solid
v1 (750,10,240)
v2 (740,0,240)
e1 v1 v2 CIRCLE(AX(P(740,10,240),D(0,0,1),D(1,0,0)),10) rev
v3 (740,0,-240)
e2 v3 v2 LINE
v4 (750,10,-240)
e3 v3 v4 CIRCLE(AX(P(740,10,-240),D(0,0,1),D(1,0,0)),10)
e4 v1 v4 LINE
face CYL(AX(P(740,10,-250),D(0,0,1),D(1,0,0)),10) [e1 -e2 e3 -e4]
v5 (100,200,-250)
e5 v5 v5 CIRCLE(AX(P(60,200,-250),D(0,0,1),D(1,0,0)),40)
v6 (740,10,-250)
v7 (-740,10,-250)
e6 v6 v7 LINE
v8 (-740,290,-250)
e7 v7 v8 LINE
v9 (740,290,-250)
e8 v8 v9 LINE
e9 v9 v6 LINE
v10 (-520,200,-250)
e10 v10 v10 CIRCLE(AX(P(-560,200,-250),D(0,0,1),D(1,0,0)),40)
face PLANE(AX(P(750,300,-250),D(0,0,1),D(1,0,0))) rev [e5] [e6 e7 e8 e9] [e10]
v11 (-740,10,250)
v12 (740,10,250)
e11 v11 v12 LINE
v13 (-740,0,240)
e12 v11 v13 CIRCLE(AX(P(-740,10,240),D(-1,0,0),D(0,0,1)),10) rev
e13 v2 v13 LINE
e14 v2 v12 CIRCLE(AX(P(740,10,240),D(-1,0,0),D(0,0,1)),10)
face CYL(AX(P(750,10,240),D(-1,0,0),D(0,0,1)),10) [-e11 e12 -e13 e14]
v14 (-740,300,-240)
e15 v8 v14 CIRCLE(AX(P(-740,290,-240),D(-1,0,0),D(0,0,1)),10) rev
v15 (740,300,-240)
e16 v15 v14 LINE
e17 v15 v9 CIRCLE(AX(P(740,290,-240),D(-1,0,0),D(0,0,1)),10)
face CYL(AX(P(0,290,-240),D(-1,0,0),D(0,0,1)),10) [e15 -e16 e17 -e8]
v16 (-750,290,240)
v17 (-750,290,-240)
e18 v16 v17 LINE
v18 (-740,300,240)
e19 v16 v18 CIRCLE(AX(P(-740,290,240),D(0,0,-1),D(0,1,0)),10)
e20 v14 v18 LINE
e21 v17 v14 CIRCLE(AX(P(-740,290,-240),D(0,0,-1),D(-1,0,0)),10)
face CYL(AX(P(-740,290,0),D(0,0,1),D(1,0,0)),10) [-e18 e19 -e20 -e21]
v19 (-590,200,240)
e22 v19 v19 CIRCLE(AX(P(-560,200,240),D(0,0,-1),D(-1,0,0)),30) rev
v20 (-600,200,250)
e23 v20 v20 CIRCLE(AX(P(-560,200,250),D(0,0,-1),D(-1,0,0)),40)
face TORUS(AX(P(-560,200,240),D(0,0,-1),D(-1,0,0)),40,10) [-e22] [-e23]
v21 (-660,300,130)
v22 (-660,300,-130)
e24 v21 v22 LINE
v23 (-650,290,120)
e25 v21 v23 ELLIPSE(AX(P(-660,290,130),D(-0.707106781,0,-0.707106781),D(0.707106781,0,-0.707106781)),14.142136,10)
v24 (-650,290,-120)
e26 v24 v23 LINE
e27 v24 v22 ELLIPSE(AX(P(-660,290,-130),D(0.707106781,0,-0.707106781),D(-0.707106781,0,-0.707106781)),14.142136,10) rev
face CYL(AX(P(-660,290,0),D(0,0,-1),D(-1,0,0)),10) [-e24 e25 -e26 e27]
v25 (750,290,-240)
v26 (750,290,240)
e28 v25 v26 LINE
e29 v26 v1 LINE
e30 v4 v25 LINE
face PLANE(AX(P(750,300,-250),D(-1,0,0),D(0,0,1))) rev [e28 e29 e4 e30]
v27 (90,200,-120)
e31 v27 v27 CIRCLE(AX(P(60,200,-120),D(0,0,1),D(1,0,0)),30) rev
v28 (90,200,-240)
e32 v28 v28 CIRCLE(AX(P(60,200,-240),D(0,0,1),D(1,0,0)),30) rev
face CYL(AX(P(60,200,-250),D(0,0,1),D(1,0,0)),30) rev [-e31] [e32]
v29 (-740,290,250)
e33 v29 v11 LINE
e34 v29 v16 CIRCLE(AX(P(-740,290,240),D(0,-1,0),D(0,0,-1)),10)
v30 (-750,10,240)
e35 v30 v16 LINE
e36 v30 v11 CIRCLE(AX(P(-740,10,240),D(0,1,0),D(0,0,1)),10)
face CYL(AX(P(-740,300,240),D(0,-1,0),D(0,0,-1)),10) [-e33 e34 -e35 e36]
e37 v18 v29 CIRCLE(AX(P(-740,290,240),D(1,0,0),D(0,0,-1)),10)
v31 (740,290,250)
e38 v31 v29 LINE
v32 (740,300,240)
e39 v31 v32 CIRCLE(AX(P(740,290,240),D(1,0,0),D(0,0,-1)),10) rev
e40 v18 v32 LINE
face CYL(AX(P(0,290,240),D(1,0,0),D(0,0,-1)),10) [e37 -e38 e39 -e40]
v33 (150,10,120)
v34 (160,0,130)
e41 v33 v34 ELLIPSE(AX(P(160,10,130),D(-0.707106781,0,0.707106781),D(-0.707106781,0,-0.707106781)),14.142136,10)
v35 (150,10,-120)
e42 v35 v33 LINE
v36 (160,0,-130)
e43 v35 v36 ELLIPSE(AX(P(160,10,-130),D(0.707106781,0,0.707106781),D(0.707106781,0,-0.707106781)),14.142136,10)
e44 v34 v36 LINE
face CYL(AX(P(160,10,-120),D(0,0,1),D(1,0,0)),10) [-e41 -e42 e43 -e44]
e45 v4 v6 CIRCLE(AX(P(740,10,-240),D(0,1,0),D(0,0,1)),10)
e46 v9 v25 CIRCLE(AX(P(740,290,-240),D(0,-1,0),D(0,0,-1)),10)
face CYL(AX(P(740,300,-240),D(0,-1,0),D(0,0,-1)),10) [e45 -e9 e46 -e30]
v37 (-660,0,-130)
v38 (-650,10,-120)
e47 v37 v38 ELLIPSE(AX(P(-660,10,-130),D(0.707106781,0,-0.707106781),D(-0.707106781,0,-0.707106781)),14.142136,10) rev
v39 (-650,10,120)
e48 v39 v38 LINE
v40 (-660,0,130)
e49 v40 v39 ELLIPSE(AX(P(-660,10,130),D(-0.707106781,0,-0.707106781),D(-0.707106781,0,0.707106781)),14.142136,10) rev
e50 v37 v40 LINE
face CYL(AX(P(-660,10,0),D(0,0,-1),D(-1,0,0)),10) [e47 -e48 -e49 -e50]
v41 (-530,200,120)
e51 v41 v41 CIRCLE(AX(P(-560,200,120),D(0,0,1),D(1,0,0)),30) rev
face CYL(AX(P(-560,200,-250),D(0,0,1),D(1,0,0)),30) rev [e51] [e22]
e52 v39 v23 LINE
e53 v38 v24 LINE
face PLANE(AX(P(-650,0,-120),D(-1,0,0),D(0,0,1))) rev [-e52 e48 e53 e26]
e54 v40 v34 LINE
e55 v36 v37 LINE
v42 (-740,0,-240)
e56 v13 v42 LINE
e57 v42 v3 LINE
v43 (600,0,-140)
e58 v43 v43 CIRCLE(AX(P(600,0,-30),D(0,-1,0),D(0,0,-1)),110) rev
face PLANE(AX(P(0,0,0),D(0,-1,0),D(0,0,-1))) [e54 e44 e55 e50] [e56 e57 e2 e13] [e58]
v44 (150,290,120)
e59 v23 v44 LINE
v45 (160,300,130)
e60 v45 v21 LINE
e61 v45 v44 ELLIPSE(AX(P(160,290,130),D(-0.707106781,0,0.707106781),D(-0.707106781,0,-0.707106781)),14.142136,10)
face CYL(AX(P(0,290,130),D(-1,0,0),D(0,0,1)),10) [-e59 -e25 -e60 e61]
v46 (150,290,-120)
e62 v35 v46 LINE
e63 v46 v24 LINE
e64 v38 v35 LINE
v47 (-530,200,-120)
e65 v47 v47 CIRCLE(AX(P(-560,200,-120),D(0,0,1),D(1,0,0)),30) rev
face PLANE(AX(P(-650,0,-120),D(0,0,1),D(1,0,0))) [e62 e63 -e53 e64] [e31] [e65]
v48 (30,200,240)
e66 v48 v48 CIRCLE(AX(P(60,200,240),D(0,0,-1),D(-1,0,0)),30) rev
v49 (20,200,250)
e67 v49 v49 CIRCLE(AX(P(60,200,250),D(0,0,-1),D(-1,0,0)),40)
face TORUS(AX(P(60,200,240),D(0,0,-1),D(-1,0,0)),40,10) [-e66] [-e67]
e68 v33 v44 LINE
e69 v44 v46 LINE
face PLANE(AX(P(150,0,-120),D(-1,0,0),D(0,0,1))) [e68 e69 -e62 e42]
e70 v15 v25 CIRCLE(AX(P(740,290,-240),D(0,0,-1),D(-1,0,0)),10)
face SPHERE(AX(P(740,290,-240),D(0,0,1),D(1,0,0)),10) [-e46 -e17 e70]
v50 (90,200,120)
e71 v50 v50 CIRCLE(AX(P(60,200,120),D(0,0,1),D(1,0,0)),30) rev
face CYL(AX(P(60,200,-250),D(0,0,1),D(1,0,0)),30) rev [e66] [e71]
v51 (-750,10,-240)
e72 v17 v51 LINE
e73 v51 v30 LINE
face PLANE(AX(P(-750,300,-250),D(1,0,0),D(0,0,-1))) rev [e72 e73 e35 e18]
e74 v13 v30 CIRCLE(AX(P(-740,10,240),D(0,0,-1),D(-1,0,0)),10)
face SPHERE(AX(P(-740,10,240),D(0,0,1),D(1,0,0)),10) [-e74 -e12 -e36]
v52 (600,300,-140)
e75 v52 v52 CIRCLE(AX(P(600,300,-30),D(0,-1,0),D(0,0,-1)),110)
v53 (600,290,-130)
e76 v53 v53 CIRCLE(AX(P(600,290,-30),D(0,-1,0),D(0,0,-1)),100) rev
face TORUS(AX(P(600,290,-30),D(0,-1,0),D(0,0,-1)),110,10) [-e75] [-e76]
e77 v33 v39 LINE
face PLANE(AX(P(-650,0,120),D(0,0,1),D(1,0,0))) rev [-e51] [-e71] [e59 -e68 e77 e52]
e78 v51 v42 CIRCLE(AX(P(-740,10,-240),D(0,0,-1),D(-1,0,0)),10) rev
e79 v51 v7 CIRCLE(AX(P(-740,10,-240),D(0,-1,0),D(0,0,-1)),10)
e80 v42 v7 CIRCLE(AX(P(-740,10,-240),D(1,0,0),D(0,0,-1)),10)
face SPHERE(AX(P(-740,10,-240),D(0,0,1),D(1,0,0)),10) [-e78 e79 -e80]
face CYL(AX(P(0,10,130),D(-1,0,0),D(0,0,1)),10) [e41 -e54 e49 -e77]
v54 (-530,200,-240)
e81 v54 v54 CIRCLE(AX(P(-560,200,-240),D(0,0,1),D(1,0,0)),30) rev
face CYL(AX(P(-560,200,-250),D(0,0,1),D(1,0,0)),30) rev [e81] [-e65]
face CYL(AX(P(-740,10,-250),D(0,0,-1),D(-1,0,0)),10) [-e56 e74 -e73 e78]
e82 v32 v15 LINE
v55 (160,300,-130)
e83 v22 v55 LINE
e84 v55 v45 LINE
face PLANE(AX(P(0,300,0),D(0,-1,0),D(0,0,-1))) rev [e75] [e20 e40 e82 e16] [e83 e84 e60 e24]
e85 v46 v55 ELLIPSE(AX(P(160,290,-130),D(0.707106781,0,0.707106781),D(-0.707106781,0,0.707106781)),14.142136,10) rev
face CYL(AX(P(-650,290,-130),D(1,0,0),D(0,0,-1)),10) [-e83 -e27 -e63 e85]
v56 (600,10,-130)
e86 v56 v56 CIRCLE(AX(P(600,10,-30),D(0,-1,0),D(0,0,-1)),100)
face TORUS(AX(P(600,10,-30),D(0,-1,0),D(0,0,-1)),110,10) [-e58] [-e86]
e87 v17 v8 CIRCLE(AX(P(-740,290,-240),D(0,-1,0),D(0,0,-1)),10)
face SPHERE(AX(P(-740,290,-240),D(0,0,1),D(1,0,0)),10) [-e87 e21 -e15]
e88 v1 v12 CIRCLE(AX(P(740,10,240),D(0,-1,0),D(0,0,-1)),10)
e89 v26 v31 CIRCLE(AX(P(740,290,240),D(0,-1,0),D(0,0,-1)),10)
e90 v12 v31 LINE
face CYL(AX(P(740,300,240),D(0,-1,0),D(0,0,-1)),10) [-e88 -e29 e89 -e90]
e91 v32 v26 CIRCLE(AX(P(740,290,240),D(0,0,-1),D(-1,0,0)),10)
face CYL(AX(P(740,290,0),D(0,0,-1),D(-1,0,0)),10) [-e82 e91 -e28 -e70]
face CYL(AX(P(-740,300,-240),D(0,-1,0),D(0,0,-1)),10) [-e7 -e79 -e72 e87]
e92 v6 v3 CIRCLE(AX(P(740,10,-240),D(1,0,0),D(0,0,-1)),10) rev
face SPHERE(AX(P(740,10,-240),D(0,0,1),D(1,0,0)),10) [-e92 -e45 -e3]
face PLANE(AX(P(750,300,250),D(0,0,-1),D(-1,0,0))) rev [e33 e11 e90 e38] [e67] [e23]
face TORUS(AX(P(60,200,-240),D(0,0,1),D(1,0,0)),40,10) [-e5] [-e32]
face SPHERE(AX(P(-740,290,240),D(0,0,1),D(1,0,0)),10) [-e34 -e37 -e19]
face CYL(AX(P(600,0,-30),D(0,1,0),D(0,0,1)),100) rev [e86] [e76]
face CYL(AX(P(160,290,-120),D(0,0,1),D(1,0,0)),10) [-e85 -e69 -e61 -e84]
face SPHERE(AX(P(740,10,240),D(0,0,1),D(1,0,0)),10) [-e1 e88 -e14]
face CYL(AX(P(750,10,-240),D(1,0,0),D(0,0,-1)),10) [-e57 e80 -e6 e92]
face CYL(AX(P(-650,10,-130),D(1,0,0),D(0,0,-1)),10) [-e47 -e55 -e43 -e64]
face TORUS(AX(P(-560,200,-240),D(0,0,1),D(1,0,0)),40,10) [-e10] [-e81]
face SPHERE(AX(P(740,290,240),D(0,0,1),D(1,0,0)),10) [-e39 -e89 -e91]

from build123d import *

# Parameters (mm, degrees)
SKETCH1_W               = 1500
SKETCH1_H               = 500
BOSS_EXTRUDE6_DEPTH     = 300
CUT_EXTRUDE3_DEPTH      = 951
CUT_EXTRUDE3_DEPTH_BACK = 951
SKETCH4_R               = 30
FILLET1_R               = 10
FILLET3_R               = 10
FILLET4_R               = 10
FILLET5_R               = 10
FILLET6_R               = 10
FILLET7_R               = 10
CUT_EXTRUDE6_DEPTH      = 846.576726294
CUT_EXTRUDE6_DEPTH_BACK = 846.576726294
SKETCH6_R               = 100
SKETCH6_W               = 800
SKETCH6_H               = 240
FILLET8_R               = 10
FILLET9_R               = 10


with BuildPart() as part:
    # Sketch1 → Boss-Extrude6 (new body)
    with BuildSketch(Plane(origin=(0, 0, 0), x_dir=(1, 0, 0), z_dir=(0, 1, 0))):
        Rectangle(SKETCH1_W, SKETCH1_H)
    extrude(amount=BOSS_EXTRUDE6_DEPTH)

    # Sketch4 → Cut-Extrude3 (cut, two sides: drawn at the far end of the back side and taken through both)
    with BuildSketch(Plane.XY.offset(250).offset(-CUT_EXTRUDE3_DEPTH_BACK)):
        with Locations((-560, 200)):
            Circle(SKETCH4_R)
        with Locations((60, 200)):
            Circle(SKETCH4_R)
    extrude(amount=CUT_EXTRUDE3_DEPTH + CUT_EXTRUDE3_DEPTH_BACK, mode=Mode.SUBTRACT)

    # Fillet1
    fillet1_edges = [part.edges().sort_by_distance(p)[0] for p in [
        (0, 0, -250),
        (750, 0, 0),
        (0, 0, 250),
        (-750, 0, 0),
    ]]
    fillet(fillet1_edges, radius=FILLET1_R)

    # Fillet3
    # the kernel refuses this fillet: 10 mm, written as the material it takes off along each edge
    with BuildSketch(Plane(origin=(-740, 10, -240), x_dir=(-1, 0, 0), z_dir=(0, 0, -1))) as fillet3_piece_1_section:
        Polygon((0, 0), (FILLET3_R, 0), (FILLET3_R, -FILLET3_R), (0, -FILLET3_R), align=None)
    fillet3_piece_1 = extrude(amount=FILLET3_R, mode=Mode.PRIVATE)
    fillet3_piece_1 = fillet3_piece_1 - Plane(origin=(-740, 10, -240), x_dir=(0.7071067811865475, 0.7071067811865475, 0), z_dir=(0, 0, -1)) * Sphere(FILLET3_R, mode=Mode.PRIVATE)
    add(fillet3_piece_1, mode=Mode.SUBTRACT)
    with BuildSketch(Plane(origin=(740, 10, -240), x_dir=(1, 0, 0), z_dir=(0, 0, -1))) as fillet3_piece_2_section:
        Polygon((0, 0), (FILLET3_R, 0), (FILLET3_R, FILLET3_R), (0, FILLET3_R), align=None)
    fillet3_piece_2 = extrude(amount=FILLET3_R, mode=Mode.PRIVATE)
    fillet3_piece_2 = fillet3_piece_2 - Plane(origin=(740, 10, -240), x_dir=(-0.7071067811865475, 0.7071067811865475, 0), z_dir=(0, 0, -1)) * Sphere(FILLET3_R, mode=Mode.PRIVATE)
    add(fillet3_piece_2, mode=Mode.SUBTRACT)
    with BuildSketch(Plane(origin=(775, 300, -250), x_dir=(0, -1, 0), z_dir=(-1, 0, 0))) as fillet3_piece_3:
        with BuildLine():
            CenterArc((FILLET3_R, FILLET3_R), FILLET3_R, 180, 90)
            Line((0, FILLET3_R), (0, 0))
            Line((0, 0), (FILLET3_R, 0))
        make_face()
    extrude(amount=1550, mode=Mode.SUBTRACT)
    with BuildSketch(Plane(origin=(-750, 10, -250), x_dir=(1, 0, 0), z_dir=(0, 1, 0))) as fillet3_piece_4:
        with BuildLine():
            CenterArc((FILLET3_R, -FILLET3_R), FILLET3_R, 90, 90)
            Line((0, -FILLET3_R), (0, 0))
            Line((0, 0), (FILLET3_R, 0))
        make_face()
    extrude(amount=315, mode=Mode.SUBTRACT)
    with BuildSketch(Plane(origin=(750, 10, -250), x_dir=(-1, 0, 0), z_dir=(0, 1, 0))) as fillet3_piece_5:
        with BuildLine():
            CenterArc((FILLET3_R, FILLET3_R), FILLET3_R, 180, 90)
            Line((0, FILLET3_R), (0, 0))
            Line((0, 0), (FILLET3_R, 0))
        make_face()
    extrude(amount=315, mode=Mode.SUBTRACT)

    # Fillet4
    fillet4_edges = [part.edges().sort_by_distance(p)[0] for p in [
        (-590, 200, -250),
        (30, 200, -250),
    ]]
    fillet(fillet4_edges, radius=FILLET4_R)

    # Fillet5
    fillet5_edges = [part.edges().sort_by_distance(p)[0] for p in [
        (-590, 200, 250),
        (30, 200, 250),
    ]]
    fillet(fillet5_edges, radius=FILLET5_R)

    # Fillet6
    # the kernel refuses this fillet: 10 mm, written as the material it takes off along each edge
    with BuildSketch(Plane(origin=(-740, 10, 240), x_dir=(-1, 0, 0), z_dir=(0, 0, 1))) as fillet6_piece_1_section:
        Polygon((0, 0), (FILLET6_R, 0), (FILLET6_R, FILLET6_R), (0, FILLET6_R), align=None)
    fillet6_piece_1 = extrude(amount=FILLET6_R, mode=Mode.PRIVATE)
    fillet6_piece_1 = fillet6_piece_1 - Plane(origin=(-740, 10, 240), x_dir=(0.7071067811865475, 0.7071067811865475, 0), z_dir=(0, 0, 1)) * Sphere(FILLET6_R, mode=Mode.PRIVATE)
    add(fillet6_piece_1, mode=Mode.SUBTRACT)
    with BuildSketch(Plane(origin=(740, 10, 240), x_dir=(1, 0, 0), z_dir=(0, 0, 1))) as fillet6_piece_2_section:
        Polygon((0, 0), (FILLET6_R, 0), (FILLET6_R, -FILLET6_R), (0, -FILLET6_R), align=None)
    fillet6_piece_2 = extrude(amount=FILLET6_R, mode=Mode.PRIVATE)
    fillet6_piece_2 = fillet6_piece_2 - Plane(origin=(740, 10, 240), x_dir=(-0.7071067811865475, 0.7071067811865475, 0), z_dir=(0, 0, 1)) * Sphere(FILLET6_R, mode=Mode.PRIVATE)
    add(fillet6_piece_2, mode=Mode.SUBTRACT)
    with BuildSketch(Plane(origin=(750, 10, 250), x_dir=(-1, 0, 0), z_dir=(0, 1, 0))) as fillet6_piece_3:
        with BuildLine():
            CenterArc((FILLET6_R, -FILLET6_R), FILLET6_R, 90, 90)
            Line((0, -FILLET6_R), (0, 0))
            Line((0, 0), (FILLET6_R, 0))
        make_face()
    extrude(amount=315, mode=Mode.SUBTRACT)
    with BuildSketch(Plane(origin=(-750, 10, 250), x_dir=(1, 0, 0), z_dir=(0, 1, 0))) as fillet6_piece_4:
        with BuildLine():
            CenterArc((FILLET6_R, FILLET6_R), FILLET6_R, 180, 90)
            Line((0, FILLET6_R), (0, 0))
            Line((0, 0), (FILLET6_R, 0))
        make_face()
    extrude(amount=315, mode=Mode.SUBTRACT)
    with BuildSketch(Plane(origin=(-775, 300, 250), x_dir=(0, -1, 0), z_dir=(1, 0, 0))) as fillet6_piece_5:
        with BuildLine():
            CenterArc((FILLET6_R, FILLET6_R), FILLET6_R, 180, 90)
            Line((0, FILLET6_R), (0, 0))
            Line((0, 0), (FILLET6_R, 0))
        make_face()
    extrude(amount=1550, mode=Mode.SUBTRACT)

    # Fillet7
    # the kernel refuses this fillet: 10 mm, written as the material it takes off along each edge
    with BuildSketch(Plane(origin=(740, 290, -240), x_dir=(0, 1, 0), z_dir=(1, 0, 0))) as fillet7_piece_1_section:
        Polygon((0, 0), (FILLET7_R, 0), (FILLET7_R, -FILLET7_R), (0, -FILLET7_R), align=None)
    fillet7_piece_1 = extrude(amount=FILLET7_R, mode=Mode.PRIVATE)
    fillet7_piece_1 = fillet7_piece_1 - Plane(origin=(740, 290, -240), x_dir=(0, -0.7071067811865475, 0.7071067811865475), z_dir=(1, 0, 0)) * Sphere(FILLET7_R, mode=Mode.PRIVATE)
    add(fillet7_piece_1, mode=Mode.SUBTRACT)
    with BuildSketch(Plane(origin=(-740, 290, -240), x_dir=(-1, 0, 0), z_dir=(0, 1, 0))) as fillet7_piece_2_section:
        Polygon((0, 0), (FILLET7_R, 0), (FILLET7_R, -FILLET7_R), (0, -FILLET7_R), align=None)
    fillet7_piece_2 = extrude(amount=FILLET7_R, mode=Mode.PRIVATE)
    fillet7_piece_2 = fillet7_piece_2 - Plane(origin=(-740, 290, -240), x_dir=(0.7071067811865477, 0, 0.7071067811865475), z_dir=(0, 1, 0)) * Sphere(FILLET7_R, mode=Mode.PRIVATE)
    add(fillet7_piece_2, mode=Mode.SUBTRACT)
    with BuildSketch(Plane(origin=(-740, 290, 240), x_dir=(-1, 0, 0), z_dir=(0, 1, 0))) as fillet7_piece_3_section:
        Polygon((0, 0), (FILLET7_R, 0), (FILLET7_R, FILLET7_R), (0, FILLET7_R), align=None)
    fillet7_piece_3 = extrude(amount=FILLET7_R, mode=Mode.PRIVATE)
    fillet7_piece_3 = fillet7_piece_3 - Plane(origin=(-740, 290, 240), x_dir=(0.7071067811865475, 0, -0.7071067811865476), z_dir=(0, 1, 0)) * Sphere(FILLET7_R, mode=Mode.PRIVATE)
    add(fillet7_piece_3, mode=Mode.SUBTRACT)
    with BuildSketch(Plane(origin=(740, 290, 240), x_dir=(0, 1, 0), z_dir=(1, 0, 0))) as fillet7_piece_4_section:
        Polygon((0, 0), (FILLET7_R, 0), (FILLET7_R, FILLET7_R), (0, FILLET7_R), align=None)
    fillet7_piece_4 = extrude(amount=FILLET7_R, mode=Mode.PRIVATE)
    fillet7_piece_4 = fillet7_piece_4 - Plane(origin=(740, 290, 240), x_dir=(0, -0.7071067811865475, -0.7071067811865475), z_dir=(1, 0, 0)) * Sphere(FILLET7_R, mode=Mode.PRIVATE)
    add(fillet7_piece_4, mode=Mode.SUBTRACT)
    with BuildSketch(Plane(origin=(-750, 300, -240), x_dir=(1, 0, 0), z_dir=(0, 0, 1))) as fillet7_piece_5:
        with BuildLine():
            CenterArc((FILLET7_R, -FILLET7_R), FILLET7_R, 90, 90)
            Line((0, -FILLET7_R), (0, 0))
            Line((0, 0), (FILLET7_R, 0))
        make_face()
    extrude(amount=480, mode=Mode.SUBTRACT)
    with BuildSketch(Plane(origin=(750, 300, 240), x_dir=(0, -1, 0), z_dir=(0, 0, -1))) as fillet7_piece_6:
        with BuildLine():
            CenterArc((FILLET7_R, FILLET7_R), FILLET7_R, 180, 90)
            Line((0, FILLET7_R), (0, 0))
            Line((0, 0), (FILLET7_R, 0))
        make_face()
    extrude(amount=480, mode=Mode.SUBTRACT)

    # Sketch6 → Cut-Extrude6 (cut, two sides: drawn at the far end of the back side and taken through both)
    with BuildSketch(Plane(origin=(0, 300, 0), x_dir=(1, 0, 0), z_dir=(0, 1, 0)).offset(-CUT_EXTRUDE6_DEPTH_BACK)):
        with Locations(Location((600, 30, 0), (0, 0, 270))):
            Circle(SKETCH6_R)
        with Locations((-250, 0)):
            Rectangle(SKETCH6_W, SKETCH6_H)
    extrude(amount=CUT_EXTRUDE6_DEPTH + CUT_EXTRUDE6_DEPTH_BACK, mode=Mode.SUBTRACT)

    # Fillet8
    fillet8_edges = [part.edges().sort_by_distance(p)[0] for p in [
        (600, 300, -130),
        (-650, 300, 0),
        (-250, 300, -120),
        (-250, 300, 120),
        (150, 300, 0),
    ]]
    fillet(fillet8_edges, radius=FILLET8_R)

    # Fillet9
    fillet9_edges = [part.edges().sort_by_distance(p)[0] for p in [
        (600, 0, -130),
        (-650, 0, 0),
        (-250, 0, 120),
        (-250, 0, -120),
        (150, 0, 0),
    ]]
    fillet(fillet9_edges, radius=FILLET9_R)


solid = part.part
